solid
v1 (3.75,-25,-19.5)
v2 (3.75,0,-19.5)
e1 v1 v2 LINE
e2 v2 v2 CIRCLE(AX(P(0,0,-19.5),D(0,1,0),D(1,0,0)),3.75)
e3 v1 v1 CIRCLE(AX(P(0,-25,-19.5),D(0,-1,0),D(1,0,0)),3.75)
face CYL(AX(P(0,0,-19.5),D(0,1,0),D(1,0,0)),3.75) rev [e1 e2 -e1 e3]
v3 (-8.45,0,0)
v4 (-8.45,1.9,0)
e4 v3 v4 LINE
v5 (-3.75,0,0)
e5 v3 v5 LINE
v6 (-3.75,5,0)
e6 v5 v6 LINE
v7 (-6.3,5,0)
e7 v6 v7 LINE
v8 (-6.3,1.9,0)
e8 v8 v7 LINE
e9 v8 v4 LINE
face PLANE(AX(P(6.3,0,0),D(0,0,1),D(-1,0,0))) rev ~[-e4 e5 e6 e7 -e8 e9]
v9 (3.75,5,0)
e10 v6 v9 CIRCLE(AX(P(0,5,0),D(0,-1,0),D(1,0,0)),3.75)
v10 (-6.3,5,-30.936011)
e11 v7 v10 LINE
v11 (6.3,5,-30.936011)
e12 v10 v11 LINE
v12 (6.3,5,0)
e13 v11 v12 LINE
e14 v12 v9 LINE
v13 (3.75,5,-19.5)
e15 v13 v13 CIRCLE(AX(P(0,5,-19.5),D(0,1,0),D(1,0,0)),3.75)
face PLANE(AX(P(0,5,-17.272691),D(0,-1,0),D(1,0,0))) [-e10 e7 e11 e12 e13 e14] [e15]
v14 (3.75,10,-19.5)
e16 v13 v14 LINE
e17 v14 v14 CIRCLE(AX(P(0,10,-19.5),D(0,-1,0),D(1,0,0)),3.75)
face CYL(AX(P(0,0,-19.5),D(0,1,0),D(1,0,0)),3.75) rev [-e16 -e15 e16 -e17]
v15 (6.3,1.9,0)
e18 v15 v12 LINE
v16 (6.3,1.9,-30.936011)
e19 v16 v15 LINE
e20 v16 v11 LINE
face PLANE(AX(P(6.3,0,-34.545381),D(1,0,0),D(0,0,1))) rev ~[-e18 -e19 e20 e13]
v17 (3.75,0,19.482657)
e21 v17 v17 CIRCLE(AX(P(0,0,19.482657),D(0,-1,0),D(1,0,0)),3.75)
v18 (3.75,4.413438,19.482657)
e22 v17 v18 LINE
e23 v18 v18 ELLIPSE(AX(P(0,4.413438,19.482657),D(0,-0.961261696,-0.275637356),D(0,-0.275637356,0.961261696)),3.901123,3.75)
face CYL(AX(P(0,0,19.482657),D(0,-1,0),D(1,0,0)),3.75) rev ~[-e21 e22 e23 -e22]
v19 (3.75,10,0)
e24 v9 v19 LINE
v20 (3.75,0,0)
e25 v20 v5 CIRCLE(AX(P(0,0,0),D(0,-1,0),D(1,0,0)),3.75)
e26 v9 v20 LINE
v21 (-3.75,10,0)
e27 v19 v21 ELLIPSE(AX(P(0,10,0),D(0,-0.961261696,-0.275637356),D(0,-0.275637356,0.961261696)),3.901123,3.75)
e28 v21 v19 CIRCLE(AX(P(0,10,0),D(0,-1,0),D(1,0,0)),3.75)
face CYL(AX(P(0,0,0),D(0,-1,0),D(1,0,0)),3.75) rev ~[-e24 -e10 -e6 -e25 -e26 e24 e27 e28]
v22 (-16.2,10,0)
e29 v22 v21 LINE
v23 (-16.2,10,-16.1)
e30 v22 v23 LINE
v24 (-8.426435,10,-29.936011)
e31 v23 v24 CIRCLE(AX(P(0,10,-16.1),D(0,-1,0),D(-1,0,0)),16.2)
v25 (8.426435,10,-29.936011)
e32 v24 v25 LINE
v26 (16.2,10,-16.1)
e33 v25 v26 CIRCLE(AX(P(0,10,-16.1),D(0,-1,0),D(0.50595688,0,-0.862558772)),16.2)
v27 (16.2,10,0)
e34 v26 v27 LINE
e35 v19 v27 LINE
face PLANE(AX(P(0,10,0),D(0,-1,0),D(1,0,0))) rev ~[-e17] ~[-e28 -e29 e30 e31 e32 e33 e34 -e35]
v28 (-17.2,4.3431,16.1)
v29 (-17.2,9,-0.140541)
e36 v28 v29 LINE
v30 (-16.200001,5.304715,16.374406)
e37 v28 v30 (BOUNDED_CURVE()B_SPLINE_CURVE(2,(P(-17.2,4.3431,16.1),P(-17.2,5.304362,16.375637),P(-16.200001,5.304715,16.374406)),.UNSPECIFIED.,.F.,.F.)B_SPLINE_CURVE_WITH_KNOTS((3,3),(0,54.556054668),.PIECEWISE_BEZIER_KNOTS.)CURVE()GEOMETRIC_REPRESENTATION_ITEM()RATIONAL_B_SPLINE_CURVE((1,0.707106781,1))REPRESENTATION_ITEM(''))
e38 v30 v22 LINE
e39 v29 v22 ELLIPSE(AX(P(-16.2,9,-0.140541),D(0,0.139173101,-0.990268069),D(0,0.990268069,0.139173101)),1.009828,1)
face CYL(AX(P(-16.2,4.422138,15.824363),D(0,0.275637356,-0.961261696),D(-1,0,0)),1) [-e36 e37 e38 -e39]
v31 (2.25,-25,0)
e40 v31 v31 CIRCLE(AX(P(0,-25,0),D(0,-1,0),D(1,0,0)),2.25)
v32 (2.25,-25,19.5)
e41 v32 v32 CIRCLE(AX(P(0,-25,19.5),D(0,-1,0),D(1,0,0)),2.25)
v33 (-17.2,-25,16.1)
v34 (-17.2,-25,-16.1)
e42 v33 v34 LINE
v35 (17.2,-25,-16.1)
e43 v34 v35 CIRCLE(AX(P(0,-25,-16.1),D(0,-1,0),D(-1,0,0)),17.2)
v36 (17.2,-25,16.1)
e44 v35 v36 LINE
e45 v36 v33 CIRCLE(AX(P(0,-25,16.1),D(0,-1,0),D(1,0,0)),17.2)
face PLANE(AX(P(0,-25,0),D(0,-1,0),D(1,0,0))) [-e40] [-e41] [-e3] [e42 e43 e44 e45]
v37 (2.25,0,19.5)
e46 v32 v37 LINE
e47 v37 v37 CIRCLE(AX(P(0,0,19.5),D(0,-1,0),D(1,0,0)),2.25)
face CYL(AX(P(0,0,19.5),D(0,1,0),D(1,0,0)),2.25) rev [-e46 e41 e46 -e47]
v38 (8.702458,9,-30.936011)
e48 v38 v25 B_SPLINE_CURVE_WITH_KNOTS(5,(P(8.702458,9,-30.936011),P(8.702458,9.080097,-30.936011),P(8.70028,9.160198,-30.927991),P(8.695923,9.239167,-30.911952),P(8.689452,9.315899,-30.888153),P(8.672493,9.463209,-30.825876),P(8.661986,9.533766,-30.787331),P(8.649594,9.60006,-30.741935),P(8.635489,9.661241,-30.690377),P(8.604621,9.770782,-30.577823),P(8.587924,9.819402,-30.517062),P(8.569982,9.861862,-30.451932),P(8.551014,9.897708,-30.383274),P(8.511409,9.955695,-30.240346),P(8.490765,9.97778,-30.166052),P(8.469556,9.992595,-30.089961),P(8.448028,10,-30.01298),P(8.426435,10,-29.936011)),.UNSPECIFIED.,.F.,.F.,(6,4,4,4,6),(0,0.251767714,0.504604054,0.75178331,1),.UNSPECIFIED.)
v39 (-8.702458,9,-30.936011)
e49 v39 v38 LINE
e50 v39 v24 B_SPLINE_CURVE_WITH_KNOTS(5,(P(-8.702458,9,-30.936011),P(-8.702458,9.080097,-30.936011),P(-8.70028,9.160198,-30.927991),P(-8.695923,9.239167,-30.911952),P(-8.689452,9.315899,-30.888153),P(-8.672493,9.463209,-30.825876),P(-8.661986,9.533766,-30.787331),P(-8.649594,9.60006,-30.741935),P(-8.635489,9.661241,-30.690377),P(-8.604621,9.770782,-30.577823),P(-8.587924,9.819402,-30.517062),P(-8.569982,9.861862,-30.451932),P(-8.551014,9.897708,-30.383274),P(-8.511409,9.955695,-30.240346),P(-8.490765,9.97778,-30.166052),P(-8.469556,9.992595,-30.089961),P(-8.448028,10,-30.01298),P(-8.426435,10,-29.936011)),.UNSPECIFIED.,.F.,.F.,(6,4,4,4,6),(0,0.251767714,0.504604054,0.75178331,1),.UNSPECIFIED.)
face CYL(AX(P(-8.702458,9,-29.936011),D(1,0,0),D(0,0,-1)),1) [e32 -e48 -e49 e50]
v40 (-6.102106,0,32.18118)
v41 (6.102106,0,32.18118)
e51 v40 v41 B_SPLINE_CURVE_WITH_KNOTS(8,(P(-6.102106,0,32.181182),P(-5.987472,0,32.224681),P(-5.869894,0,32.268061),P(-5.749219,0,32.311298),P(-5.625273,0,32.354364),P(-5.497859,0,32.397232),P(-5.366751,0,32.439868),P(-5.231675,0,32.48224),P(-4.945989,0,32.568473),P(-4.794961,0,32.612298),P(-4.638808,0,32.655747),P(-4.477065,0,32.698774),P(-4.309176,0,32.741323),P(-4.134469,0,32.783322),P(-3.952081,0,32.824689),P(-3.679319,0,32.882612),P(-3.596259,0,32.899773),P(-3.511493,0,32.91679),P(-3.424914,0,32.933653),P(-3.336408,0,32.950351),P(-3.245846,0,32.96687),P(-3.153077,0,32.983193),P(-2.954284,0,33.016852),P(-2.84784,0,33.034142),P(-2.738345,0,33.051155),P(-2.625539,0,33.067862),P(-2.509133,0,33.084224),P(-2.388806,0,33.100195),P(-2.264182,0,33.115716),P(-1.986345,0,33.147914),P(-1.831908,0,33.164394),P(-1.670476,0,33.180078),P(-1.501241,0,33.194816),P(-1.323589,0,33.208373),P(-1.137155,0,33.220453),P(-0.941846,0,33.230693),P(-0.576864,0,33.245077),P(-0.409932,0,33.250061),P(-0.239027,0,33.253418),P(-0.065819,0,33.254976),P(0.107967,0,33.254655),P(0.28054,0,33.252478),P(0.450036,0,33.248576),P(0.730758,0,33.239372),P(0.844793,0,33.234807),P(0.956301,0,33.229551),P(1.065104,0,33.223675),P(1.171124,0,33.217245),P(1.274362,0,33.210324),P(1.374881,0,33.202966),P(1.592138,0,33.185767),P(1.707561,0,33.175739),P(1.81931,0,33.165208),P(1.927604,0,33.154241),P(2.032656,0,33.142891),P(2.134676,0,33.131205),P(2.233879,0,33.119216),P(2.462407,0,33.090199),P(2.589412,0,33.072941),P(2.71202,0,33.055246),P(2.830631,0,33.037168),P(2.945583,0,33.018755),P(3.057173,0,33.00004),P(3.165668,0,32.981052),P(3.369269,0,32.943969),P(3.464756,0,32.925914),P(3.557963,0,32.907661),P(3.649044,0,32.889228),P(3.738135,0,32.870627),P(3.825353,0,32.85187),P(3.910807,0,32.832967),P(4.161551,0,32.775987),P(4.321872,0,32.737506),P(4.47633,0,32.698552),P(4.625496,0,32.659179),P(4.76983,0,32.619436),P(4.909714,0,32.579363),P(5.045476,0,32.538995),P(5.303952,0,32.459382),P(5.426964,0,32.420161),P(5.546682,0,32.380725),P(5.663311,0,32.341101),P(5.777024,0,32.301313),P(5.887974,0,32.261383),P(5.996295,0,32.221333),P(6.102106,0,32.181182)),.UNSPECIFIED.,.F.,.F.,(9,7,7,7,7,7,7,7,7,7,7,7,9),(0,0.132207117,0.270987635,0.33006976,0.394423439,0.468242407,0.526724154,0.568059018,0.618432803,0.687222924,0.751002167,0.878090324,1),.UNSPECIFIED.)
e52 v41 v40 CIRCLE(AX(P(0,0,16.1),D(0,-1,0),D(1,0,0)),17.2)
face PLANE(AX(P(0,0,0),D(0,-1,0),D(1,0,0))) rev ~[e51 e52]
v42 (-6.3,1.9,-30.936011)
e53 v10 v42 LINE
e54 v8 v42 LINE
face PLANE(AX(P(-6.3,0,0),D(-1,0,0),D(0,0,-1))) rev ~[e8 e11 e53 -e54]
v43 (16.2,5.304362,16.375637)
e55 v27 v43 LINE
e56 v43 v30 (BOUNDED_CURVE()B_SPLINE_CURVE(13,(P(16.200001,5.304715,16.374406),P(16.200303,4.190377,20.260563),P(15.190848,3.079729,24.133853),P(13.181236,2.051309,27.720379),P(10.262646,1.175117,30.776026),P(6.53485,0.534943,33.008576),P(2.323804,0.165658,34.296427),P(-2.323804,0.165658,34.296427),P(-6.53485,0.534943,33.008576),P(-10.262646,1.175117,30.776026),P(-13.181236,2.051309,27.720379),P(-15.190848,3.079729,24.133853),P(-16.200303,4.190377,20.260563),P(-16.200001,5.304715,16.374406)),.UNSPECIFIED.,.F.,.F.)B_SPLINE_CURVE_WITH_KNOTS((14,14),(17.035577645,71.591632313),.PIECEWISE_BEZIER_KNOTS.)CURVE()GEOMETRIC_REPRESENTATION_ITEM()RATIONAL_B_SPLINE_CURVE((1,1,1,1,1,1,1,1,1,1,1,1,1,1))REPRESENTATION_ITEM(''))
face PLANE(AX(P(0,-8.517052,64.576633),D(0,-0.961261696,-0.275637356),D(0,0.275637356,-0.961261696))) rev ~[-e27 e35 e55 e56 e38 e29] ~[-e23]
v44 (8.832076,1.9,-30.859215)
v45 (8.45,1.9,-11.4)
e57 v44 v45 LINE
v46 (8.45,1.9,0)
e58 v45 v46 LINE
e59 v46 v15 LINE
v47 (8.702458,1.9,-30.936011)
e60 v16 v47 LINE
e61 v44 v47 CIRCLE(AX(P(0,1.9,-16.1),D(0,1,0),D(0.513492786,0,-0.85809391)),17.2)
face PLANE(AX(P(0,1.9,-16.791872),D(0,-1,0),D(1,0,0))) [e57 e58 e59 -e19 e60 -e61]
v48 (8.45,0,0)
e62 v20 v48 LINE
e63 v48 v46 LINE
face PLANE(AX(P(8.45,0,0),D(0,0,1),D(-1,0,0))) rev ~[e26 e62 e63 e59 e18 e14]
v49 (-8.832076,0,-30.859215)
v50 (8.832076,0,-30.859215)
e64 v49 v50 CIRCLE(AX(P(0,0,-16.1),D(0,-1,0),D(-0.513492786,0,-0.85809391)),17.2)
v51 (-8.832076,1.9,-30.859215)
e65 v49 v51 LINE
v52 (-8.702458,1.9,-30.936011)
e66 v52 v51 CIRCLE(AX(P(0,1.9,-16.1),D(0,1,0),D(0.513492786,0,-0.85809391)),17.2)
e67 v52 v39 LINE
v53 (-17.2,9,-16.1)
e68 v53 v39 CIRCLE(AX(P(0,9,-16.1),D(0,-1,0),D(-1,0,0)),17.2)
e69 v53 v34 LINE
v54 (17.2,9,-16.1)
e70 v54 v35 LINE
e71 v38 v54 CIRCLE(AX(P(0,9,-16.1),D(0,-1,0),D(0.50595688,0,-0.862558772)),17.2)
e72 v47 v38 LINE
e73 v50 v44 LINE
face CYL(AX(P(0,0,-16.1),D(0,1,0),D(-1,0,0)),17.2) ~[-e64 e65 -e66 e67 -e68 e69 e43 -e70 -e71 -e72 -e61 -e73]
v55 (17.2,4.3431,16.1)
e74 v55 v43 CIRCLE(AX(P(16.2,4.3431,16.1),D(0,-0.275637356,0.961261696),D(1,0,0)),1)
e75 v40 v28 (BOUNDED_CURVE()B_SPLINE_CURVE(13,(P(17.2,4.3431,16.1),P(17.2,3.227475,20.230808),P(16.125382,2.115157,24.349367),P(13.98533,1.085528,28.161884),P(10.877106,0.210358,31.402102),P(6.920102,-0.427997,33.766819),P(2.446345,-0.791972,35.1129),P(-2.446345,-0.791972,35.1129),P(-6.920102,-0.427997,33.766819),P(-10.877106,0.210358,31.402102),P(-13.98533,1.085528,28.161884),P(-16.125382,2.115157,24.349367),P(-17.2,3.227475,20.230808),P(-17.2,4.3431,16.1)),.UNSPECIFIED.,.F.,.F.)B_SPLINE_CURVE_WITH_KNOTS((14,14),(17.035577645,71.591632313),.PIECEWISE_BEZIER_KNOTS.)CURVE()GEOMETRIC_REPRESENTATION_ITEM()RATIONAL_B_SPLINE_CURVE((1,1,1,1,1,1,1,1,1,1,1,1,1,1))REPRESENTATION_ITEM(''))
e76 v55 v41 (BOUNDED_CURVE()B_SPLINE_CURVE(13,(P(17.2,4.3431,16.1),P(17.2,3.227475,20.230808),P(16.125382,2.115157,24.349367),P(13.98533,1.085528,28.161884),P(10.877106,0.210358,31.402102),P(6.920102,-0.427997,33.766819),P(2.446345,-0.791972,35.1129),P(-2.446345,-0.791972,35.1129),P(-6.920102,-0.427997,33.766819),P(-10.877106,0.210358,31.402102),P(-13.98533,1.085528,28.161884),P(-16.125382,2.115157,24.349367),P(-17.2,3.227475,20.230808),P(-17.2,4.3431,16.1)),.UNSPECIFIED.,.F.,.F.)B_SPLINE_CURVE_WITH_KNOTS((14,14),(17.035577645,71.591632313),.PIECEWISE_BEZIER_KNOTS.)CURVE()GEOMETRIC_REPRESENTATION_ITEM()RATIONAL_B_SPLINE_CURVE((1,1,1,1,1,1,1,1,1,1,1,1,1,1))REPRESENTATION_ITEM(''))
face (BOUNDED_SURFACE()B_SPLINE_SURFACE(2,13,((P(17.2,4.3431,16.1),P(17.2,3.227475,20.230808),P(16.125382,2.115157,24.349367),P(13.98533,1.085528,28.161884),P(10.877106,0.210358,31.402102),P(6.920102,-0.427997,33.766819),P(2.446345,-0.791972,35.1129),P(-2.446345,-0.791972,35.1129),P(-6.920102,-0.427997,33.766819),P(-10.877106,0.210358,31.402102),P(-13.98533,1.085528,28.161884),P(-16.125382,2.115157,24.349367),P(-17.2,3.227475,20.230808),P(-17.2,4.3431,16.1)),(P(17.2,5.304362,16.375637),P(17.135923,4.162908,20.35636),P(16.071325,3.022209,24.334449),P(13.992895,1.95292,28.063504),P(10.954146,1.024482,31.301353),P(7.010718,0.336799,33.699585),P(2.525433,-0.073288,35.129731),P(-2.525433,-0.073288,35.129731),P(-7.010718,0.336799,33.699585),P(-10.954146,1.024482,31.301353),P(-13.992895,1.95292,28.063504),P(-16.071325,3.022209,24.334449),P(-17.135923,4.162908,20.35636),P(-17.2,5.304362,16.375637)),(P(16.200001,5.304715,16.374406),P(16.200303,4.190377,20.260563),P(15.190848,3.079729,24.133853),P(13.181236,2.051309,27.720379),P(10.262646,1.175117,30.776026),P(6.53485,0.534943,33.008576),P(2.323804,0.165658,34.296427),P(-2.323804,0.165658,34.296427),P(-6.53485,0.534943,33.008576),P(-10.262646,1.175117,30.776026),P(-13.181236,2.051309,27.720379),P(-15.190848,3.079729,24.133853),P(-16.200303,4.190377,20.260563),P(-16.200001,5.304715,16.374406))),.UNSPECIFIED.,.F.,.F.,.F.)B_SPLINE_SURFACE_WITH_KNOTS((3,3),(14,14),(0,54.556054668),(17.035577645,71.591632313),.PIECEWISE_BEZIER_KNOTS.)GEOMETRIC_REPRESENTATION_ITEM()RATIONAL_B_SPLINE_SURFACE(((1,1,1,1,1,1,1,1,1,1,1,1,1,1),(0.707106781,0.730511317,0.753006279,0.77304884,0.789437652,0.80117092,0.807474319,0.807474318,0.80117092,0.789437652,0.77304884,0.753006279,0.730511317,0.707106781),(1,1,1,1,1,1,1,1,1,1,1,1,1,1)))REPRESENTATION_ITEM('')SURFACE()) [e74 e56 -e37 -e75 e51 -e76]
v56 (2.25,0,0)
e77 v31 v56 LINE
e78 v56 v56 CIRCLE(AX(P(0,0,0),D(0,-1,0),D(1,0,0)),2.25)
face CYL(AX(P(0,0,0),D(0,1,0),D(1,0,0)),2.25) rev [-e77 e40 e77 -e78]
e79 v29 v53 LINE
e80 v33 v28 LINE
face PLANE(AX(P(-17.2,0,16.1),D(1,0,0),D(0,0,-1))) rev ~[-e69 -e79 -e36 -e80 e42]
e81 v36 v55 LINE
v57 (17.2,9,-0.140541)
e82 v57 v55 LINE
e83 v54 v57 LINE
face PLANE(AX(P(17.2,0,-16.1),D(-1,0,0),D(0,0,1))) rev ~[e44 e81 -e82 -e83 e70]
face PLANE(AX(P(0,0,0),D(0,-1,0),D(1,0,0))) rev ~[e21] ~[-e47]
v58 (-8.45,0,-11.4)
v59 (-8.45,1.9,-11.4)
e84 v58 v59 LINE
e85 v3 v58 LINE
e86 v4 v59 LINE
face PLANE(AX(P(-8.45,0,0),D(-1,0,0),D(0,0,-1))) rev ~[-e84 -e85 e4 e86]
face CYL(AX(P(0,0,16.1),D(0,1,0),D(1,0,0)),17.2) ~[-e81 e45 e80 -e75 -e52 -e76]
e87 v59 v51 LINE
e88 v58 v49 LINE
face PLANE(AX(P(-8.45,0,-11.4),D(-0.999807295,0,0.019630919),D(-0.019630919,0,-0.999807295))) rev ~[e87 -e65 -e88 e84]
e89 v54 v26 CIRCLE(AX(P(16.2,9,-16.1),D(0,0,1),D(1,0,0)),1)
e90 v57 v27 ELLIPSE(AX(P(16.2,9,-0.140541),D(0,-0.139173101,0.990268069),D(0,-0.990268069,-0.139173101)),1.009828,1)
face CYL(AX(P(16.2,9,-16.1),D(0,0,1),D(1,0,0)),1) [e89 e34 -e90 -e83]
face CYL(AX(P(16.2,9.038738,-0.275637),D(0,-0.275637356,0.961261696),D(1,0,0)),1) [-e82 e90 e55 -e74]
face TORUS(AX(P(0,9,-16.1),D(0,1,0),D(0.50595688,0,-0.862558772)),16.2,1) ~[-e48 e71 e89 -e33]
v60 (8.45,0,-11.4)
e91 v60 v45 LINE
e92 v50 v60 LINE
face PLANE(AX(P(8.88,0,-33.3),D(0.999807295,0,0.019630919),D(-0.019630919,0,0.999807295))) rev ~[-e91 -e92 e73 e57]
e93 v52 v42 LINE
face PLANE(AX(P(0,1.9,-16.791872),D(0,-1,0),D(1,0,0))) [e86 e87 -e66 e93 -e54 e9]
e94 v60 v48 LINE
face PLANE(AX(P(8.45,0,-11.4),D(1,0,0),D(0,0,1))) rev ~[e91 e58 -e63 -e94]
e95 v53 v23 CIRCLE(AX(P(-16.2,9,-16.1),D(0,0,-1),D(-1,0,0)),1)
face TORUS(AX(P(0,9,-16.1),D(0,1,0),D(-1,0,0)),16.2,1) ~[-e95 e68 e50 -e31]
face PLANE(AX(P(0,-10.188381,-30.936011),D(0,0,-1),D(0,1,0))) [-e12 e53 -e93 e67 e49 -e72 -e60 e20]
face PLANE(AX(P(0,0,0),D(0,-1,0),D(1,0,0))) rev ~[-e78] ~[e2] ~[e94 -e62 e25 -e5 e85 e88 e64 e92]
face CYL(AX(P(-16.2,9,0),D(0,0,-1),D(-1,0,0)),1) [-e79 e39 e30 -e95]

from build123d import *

# Parameters (mm, degrees)
F0_R          = 3.75
F0_R_2        = 2.25
F1_DEPTH      = 10
F1_DEPTH_BACK = 5
F4_DEPTH      = 1.9
F5_DEPTH      = 5
F7_DEPTH      = 20
F8_W          = 32.4212387204
F8_H          = 10.9641202658
F9_DEPTH      = 20
F10_R         = 3.75
F11_DEPTH     = 16.2
F12_S5_R      = 3.75
F12_T6_DEPTH  = 8
F13_S6_R      = 3.75
F13_T7_DEPTH  = 8
F13_S13_R     = 3.75
F13_T14_DEPTH = 8
F13_S20_R     = 3.75
F13_T21_DEPTH = 8
F14_R         = 1
F16_DEPTH     = 25
F17_DEPTH     = 22


# Not quite as in the source:
# - a fillet or chamfer that OpenCascade refuses, or shapes differently, is made with other operations: its cross-section is extruded or revolved along the edge and cut away or added


with BuildPart() as f1:
    # F0 (on Front) → F1 (new body, two sides)
    with BuildSketch(Plane.XZ) as f1_sk:
        with BuildLine():
            Line((-17.2, 16.1), (-17.2, -16.1))
            ThreePointArc((-17.2, -16.1), (0, -33.3), (17.2, -16.1))
            Line((17.2, -16.1), (17.2, 16.1))
            ThreePointArc((17.2, 16.1), (0, 33.3), (-17.2, 16.1))
        make_face()
        with Locations((0, -19.5)):
            Circle(F0_R, mode=Mode.SUBTRACT)
        Circle(F0_R_2, mode=Mode.SUBTRACT)
        with Locations((0, 19.5)):
            Circle(F0_R_2, mode=Mode.SUBTRACT)
    extrude(amount=-F1_DEPTH)
    extrude(f1_sk.sketch, amount=F1_DEPTH_BACK)

    # F2 (on Front) → F4 (cut)
    with BuildSketch(Plane.XZ):
        Polygon((-8.88, -33.3), (0, -33.3), (8.88, -33.3), (8.45, -11.4), (8.45, 0), (0, 0), (-8.45, 0), (-8.45, -11.4), align=None)
    extrude(amount=-F4_DEPTH, mode=Mode.SUBTRACT)

    # F3 (on Front) → F5 (cut)
    with BuildSketch(Plane.XZ):
        Polygon((-6.3, -34.5453813779), (0, -34.5453813779), (6.3, -34.5453813779), (6.3, 0), (0, 0), (-6.3, 0), align=None)
    extrude(amount=-F5_DEPTH, mode=Mode.SUBTRACT)

    # F6 (on Right) → F7 (cut, symmetric)
    with BuildSketch(Plane.YZ):
        Polygon((-8.5170516447, 64.5766333631), (10, 0), (10, 64.5766333631), align=None)
    extrude(amount=F7_DEPTH, both=True, mode=Mode.SUBTRACT)

    # F8 (on Right) → F9 (cut, symmetric)
    with BuildSketch(Plane.YZ):
        with Locations((6.0222381726, -36.4180710167)):
            Rectangle(F8_W, F8_H)
    extrude(amount=F9_DEPTH, both=True, mode=Mode.SUBTRACT)

    # F10 (on Front) → F11 (cut)
    with BuildSketch(Plane.XZ):
        Circle(F10_R)
        with Locations((0, 19.4826573133)):
            Circle(F10_R)
    extrude(amount=-F11_DEPTH, mode=Mode.SUBTRACT)

    # F12: chamfer of 2.5 on 1 edges, made by hand


with BuildPart() as f12_tool2:
    # F12_s3 → F12_t4 (revolve)
    with BuildSketch(Plane.XY.offset(19.5)):
        Polygon((2.25, -2.5), (4.75, 0), (2.25, 0), align=None)
    revolve(axis=Axis((0, 0, 19.5), (0, -1, 0)))

    # F12_s5 → F12_t6 (intersect, symmetric)
    with BuildSketch(Plane.XZ.offset(1.2)):
        with Locations((0, 19.4826573133)):
            Circle(F12_S5_R)
    extrude(amount=F12_T6_DEPTH, both=True, mode=Mode.INTERSECT)


with BuildPart() as f1_1:
    add(f1.part)

    # F12_t1: cut F12_tool2
    add(f12_tool2.part, mode=Mode.SUBTRACT)

    # F13: chamfer of 2.5 on 1 edges, made by hand


with BuildPart() as f13_tool2:
    # F13_s3 → F13_t4 (revolve)
    with BuildSketch(Plane.XY):
        Polygon((4.75, 0), (2.25, -2.5), (2.25, 0), align=None)
    revolve(axis=Axis((0, 0, 0), (0, 1, 0)))

    split(bisect_by=Plane.XY, keep=Keep.BOTTOM)

    # F13_s6 → F13_t7 (cut, symmetric)
    with BuildSketch(Plane.XZ.offset(1.2)):
        Circle(F13_S6_R)
    extrude(amount=F13_T7_DEPTH, both=True, mode=Mode.SUBTRACT)


with BuildPart() as f1_2:
    add(f1_1.part)

    # F13_t1: cut F13_tool2
    add(f13_tool2.part, mode=Mode.SUBTRACT)


with BuildPart() as f13_tool9:
    # F13_s10 → F13_t11 (revolve)
    with BuildSketch(Plane.XY):
        Polygon((4.75, 0), (2.25, -2.5), (2.25, 0), align=None)
    revolve(axis=Axis((0, 0, 0), (0, 1, 0)))

    split(bisect_by=Plane.XY, keep=Keep.BOTTOM)

    # F13_s13 → F13_t14 (intersect, symmetric)
    with BuildSketch(Plane.XZ.offset(1.2)):
        Circle(F13_S13_R)
    extrude(amount=F13_T14_DEPTH, both=True, mode=Mode.INTERSECT)


with BuildPart() as f1_3:
    add(f1_2.part)

    # F13_t8: cut F13_tool9
    add(f13_tool9.part, mode=Mode.SUBTRACT)


with BuildPart() as f13_tool16:
    # F13_s17 → F13_t18 (revolve)
    with BuildSketch(Plane.XY):
        Polygon((4.75, 0), (2.25, -2.5), (2.25, 0), align=None)
    revolve(axis=Axis((0, 0, 0), (0, 1, 0)))

    split(bisect_by=Plane.XY, keep=Keep.TOP)

    # F13_s20 → F13_t21 (intersect, symmetric)
    with BuildSketch(Plane.XZ.offset(1.2)):
        Circle(F13_S20_R)
    extrude(amount=F13_T21_DEPTH, both=True, mode=Mode.INTERSECT)


with BuildPart() as f1_4:
    add(f1_3.part)

    # F13_t15: cut F13_tool16
    add(f13_tool16.part, mode=Mode.SUBTRACT)

    # F14
    f14_edges = [f1_4.edges().sort_by_distance(p)[0] for p in [
        (-17.2, 7.6917, 8.05),
        (0, 0.451379, 33.3),
        (17.2, 7.6917, 8.05),
        (17.2, 10, -8.05),
        (14.925185, 10, -24.648617),
        (-14.925185, 10, -24.648617),
        (-17.2, 10, -8.05),
        (0, 10, -30.936011),
    ]]
    fillet(f14_edges, radius=F14_R)

    # F0 (on Front) → F16 (join)
    with BuildSketch(Plane.XZ):
        with BuildLine():
            Line((-17.2, 16.1), (-17.2, -16.1))
            ThreePointArc((-17.2, -16.1), (0, -33.3), (17.2, -16.1))
            Line((17.2, -16.1), (17.2, 16.1))
            ThreePointArc((17.2, 16.1), (0, 33.3), (-17.2, 16.1))
        make_face()
        with Locations((0, -19.5)):
            Circle(F0_R, mode=Mode.SUBTRACT)
        Circle(F0_R_2, mode=Mode.SUBTRACT)
        with Locations((0, 19.5)):
            Circle(F0_R_2, mode=Mode.SUBTRACT)
    extrude(amount=F16_DEPTH)

    # F0 (on Front) → F17 (cut)
    with BuildSketch(Plane.XZ):
        with Locations((0, -19.5)):
            Circle(F0_R)
        with Locations((0, -19.5)):
            Circle(F0_R_2, mode=Mode.SUBTRACT)
    extrude(amount=F17_DEPTH, mode=Mode.SUBTRACT)


solid = f1_4.part
